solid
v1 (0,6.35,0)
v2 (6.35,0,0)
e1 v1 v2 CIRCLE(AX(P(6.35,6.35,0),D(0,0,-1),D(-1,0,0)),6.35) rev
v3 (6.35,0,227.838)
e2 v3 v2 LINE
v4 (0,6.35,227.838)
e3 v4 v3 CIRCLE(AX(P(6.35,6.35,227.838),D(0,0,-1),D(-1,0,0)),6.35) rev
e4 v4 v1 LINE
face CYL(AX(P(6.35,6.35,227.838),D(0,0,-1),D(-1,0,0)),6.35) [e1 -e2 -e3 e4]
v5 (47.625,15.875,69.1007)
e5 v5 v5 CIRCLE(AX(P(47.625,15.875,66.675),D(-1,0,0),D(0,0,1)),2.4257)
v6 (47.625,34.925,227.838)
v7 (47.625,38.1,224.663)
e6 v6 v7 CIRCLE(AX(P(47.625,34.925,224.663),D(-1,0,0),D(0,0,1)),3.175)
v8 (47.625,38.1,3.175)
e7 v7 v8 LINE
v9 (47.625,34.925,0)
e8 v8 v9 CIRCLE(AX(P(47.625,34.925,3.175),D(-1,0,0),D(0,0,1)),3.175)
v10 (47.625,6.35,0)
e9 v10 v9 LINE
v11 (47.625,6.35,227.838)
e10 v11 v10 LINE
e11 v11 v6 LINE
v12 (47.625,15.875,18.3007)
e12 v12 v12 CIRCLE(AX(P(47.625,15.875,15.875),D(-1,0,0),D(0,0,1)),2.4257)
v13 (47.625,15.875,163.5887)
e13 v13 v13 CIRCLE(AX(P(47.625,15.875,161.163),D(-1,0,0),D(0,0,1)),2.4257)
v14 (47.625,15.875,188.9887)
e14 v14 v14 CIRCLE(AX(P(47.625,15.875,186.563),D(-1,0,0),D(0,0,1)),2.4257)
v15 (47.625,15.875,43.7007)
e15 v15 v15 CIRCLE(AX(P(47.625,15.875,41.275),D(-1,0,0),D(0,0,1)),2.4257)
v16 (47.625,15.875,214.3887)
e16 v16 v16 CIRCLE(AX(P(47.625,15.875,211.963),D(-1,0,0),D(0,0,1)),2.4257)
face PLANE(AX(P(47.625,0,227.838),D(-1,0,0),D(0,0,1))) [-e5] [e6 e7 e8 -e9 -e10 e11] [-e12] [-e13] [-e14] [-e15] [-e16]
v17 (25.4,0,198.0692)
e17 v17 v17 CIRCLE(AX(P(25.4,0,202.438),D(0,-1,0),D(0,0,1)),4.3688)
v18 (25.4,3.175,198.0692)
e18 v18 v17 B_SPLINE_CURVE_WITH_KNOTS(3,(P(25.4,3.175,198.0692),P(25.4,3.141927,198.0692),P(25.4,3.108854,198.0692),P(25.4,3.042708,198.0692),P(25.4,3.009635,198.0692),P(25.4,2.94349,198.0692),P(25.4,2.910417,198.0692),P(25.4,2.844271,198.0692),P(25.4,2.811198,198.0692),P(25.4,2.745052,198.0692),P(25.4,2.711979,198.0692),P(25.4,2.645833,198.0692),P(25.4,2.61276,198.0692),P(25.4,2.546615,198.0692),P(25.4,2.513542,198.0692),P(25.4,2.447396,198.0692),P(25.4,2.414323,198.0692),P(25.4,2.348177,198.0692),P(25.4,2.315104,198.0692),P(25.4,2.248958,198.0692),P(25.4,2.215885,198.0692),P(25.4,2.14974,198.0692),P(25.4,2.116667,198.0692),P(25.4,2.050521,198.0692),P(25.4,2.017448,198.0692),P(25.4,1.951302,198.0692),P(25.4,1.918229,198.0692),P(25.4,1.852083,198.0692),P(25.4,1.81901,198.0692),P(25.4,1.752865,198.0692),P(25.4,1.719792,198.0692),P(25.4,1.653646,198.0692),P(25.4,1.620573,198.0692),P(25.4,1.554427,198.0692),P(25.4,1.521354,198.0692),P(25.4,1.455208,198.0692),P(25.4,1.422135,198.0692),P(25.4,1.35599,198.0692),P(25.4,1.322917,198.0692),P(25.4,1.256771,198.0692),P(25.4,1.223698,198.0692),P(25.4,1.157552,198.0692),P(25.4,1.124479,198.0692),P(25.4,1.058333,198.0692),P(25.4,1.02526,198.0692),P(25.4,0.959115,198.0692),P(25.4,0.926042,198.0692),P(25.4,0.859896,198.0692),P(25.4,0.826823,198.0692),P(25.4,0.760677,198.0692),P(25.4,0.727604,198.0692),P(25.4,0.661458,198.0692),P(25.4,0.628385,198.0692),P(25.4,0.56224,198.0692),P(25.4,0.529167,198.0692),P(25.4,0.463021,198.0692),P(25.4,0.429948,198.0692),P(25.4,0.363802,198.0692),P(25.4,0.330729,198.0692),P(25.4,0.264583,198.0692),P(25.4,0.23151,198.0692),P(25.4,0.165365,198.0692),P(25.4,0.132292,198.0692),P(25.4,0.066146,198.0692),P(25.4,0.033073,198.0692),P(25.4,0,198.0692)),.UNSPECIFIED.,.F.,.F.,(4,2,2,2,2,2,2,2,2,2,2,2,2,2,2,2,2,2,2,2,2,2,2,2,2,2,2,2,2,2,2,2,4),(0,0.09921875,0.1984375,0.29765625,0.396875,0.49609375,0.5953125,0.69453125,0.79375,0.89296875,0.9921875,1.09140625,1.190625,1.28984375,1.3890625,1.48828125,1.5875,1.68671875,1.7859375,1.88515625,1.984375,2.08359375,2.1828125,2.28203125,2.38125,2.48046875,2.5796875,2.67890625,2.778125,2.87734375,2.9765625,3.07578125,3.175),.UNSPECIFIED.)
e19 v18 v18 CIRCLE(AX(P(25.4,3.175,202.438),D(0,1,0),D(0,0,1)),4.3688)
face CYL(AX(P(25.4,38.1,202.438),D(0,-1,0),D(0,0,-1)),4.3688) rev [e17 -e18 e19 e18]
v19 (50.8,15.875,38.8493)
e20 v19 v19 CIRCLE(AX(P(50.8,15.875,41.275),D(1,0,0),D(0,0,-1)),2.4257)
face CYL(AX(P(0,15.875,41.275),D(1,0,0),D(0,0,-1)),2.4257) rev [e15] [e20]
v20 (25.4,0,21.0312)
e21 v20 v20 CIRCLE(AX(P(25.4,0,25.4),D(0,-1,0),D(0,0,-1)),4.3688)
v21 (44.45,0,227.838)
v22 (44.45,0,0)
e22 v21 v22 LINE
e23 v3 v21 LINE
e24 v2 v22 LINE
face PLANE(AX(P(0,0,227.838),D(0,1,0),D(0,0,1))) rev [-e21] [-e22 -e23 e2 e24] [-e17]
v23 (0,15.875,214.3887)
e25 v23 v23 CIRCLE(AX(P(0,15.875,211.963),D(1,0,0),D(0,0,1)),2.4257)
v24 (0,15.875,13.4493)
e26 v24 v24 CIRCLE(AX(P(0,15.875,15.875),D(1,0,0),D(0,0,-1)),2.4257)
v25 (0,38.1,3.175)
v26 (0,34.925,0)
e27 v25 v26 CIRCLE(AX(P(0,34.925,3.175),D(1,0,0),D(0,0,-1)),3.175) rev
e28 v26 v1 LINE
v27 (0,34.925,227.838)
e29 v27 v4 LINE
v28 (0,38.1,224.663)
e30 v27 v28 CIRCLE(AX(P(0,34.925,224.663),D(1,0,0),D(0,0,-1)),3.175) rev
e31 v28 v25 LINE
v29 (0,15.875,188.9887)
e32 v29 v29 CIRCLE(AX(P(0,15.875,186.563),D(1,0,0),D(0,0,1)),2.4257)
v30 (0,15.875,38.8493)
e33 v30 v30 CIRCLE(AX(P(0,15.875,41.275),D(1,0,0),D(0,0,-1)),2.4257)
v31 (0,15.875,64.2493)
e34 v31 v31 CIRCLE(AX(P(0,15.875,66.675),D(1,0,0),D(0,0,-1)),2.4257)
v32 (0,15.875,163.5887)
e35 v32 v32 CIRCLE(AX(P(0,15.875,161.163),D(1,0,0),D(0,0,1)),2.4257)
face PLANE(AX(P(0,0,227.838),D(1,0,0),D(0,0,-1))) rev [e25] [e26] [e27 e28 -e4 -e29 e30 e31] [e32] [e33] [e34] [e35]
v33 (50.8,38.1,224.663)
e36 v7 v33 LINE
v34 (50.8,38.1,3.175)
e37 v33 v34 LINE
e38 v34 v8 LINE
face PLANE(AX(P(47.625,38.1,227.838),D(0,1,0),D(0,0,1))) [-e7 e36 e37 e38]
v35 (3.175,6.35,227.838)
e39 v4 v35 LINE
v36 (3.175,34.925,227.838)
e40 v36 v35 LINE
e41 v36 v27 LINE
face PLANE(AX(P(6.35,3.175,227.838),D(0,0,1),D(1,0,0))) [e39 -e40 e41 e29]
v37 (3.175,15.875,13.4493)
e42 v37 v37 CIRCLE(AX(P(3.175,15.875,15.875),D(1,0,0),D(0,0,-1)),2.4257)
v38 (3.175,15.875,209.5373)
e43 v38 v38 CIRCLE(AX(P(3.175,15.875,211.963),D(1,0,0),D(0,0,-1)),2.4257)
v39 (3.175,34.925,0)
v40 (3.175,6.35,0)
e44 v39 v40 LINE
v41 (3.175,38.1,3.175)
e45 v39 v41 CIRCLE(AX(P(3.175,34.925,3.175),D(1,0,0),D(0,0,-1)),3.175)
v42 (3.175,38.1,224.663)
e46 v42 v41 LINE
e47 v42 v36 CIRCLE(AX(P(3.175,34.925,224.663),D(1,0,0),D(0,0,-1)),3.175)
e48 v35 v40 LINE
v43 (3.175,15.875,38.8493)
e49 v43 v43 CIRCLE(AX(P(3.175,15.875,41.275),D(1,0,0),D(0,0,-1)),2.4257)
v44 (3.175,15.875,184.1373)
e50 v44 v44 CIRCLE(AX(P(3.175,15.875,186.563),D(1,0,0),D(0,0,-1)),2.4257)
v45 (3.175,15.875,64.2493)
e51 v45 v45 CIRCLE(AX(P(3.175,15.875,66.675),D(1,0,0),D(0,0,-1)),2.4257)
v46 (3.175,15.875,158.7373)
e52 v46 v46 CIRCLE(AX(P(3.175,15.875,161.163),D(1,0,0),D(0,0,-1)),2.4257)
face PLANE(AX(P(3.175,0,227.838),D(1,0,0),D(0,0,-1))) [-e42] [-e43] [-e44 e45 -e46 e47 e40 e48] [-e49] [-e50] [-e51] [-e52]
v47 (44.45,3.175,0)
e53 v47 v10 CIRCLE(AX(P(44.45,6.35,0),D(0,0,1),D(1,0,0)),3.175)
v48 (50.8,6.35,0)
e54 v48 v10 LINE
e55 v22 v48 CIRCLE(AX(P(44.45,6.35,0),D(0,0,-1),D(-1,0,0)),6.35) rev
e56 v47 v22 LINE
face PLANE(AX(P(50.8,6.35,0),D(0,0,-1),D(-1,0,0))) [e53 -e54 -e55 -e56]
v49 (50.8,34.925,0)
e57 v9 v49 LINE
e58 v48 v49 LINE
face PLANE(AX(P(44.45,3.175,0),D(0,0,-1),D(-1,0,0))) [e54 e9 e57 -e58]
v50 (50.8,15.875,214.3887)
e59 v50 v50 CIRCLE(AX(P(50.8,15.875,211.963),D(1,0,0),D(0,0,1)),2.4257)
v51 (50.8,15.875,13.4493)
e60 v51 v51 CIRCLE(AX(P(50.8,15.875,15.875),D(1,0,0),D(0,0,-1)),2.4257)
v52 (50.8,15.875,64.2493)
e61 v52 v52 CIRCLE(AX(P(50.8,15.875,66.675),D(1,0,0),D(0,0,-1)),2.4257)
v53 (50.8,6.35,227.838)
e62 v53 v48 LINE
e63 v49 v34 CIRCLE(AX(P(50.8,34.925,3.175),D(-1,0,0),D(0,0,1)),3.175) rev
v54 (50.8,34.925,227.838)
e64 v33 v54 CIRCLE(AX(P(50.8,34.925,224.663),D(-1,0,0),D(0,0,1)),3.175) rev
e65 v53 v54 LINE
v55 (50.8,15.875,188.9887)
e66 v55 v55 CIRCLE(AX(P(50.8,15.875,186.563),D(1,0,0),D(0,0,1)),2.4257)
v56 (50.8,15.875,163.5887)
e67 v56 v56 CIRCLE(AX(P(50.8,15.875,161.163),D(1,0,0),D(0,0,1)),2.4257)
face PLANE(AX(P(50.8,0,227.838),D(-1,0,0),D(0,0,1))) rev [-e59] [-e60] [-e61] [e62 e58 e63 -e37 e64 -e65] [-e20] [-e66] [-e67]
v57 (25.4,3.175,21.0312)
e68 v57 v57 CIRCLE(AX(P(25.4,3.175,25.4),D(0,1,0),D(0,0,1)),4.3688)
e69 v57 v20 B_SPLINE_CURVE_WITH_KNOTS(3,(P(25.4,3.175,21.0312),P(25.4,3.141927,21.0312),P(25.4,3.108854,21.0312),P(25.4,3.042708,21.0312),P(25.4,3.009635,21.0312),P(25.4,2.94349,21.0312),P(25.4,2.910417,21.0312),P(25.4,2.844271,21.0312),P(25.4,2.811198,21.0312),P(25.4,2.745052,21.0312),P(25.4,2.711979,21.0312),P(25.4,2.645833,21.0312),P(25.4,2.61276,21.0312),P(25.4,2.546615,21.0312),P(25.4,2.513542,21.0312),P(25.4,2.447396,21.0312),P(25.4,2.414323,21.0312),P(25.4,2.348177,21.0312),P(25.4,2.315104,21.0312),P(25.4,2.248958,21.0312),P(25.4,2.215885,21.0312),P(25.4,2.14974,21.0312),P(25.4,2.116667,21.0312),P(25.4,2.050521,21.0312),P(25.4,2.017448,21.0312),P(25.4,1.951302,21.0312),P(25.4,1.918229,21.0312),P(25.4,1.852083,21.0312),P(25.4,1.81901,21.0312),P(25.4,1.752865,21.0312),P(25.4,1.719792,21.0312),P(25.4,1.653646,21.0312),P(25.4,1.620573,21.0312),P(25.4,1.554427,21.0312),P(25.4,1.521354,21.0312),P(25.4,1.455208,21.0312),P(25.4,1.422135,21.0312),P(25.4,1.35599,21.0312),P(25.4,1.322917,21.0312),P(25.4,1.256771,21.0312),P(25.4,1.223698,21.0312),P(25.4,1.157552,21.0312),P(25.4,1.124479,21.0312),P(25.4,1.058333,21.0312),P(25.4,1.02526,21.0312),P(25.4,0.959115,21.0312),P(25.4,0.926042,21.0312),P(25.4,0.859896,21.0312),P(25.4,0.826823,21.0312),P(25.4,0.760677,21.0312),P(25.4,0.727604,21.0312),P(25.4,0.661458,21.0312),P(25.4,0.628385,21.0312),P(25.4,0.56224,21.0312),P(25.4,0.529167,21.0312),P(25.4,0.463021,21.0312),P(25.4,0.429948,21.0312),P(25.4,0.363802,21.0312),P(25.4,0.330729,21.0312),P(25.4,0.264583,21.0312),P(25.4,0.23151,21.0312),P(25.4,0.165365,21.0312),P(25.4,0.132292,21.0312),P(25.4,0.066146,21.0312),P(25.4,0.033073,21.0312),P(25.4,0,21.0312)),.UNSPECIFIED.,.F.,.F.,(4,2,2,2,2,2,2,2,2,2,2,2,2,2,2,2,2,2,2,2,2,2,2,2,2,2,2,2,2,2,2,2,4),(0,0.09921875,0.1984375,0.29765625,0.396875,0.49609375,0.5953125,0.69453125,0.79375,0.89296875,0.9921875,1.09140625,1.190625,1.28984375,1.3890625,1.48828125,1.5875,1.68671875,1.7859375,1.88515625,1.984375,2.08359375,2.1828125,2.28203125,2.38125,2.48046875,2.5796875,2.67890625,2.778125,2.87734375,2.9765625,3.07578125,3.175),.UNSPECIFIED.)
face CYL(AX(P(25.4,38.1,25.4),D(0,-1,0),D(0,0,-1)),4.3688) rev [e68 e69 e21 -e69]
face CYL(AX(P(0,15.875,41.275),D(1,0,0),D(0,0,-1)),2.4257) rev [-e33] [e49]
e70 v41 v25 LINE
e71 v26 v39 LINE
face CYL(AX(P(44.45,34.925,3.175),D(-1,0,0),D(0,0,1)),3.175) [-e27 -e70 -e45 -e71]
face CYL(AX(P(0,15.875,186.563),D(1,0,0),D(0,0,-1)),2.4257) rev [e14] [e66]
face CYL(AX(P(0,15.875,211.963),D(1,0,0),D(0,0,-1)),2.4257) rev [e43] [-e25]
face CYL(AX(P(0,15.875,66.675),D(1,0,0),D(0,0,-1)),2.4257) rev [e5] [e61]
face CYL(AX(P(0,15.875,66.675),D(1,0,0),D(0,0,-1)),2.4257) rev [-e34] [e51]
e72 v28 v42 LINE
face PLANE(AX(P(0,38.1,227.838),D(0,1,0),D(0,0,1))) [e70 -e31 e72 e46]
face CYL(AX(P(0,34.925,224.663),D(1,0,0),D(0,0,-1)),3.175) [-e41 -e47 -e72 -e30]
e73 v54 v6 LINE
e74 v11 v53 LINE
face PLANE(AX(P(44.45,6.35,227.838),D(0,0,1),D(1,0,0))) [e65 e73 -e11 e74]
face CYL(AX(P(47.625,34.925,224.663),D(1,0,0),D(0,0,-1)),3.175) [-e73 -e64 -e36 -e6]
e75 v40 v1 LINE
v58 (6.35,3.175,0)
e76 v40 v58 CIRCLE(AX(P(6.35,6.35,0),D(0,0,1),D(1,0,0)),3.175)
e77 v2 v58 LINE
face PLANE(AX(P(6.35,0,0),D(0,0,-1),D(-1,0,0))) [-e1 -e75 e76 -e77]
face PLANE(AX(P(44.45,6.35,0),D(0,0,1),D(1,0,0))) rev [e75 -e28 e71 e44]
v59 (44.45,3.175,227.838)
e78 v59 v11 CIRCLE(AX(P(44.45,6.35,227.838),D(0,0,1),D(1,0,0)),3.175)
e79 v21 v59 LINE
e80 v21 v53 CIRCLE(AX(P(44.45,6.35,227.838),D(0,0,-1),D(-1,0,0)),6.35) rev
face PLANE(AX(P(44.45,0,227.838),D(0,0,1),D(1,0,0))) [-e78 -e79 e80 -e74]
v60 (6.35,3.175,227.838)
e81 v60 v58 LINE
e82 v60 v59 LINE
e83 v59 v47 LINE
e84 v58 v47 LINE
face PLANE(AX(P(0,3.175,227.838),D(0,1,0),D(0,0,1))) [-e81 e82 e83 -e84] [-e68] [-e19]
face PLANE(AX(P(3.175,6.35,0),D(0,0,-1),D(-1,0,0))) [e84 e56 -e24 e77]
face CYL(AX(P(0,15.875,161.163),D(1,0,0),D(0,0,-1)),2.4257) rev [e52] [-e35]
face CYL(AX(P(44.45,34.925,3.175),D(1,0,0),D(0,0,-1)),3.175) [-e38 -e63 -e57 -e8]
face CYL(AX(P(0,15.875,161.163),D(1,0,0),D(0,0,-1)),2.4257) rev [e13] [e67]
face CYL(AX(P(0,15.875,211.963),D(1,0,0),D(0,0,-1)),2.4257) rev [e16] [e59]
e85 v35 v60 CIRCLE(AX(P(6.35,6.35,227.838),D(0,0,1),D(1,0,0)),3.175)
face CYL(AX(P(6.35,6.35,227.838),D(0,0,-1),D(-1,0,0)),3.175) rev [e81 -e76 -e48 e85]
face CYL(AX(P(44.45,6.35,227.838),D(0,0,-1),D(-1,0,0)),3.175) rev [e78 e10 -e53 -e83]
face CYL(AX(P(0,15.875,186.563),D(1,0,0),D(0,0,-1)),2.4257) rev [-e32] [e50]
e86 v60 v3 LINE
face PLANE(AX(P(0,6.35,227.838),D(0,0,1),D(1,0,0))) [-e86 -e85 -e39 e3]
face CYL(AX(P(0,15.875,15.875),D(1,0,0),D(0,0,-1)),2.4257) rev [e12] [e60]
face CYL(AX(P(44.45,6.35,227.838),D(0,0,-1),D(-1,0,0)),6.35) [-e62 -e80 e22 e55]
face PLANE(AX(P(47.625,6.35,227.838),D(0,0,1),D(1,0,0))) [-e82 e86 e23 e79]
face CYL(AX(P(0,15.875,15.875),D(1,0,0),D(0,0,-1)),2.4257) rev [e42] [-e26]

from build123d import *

# Parameters (mm, degrees)
BASE_FLANGE1_DEPTH = 227.838
SKETCH6_R          = 2.4257
CUT_EXTRUDE1_DEPTH = 237.521466772
SKETCH7_R          = 4.3688
CUT_EXTRUDE2_DEPTH = 237.521466772
FILLET1_R          = 3.175


# Sheet-metal steps are written as plain solids
with BuildPart() as part:
    # Sketch1 → Base-Flange1 (new body)
    with BuildSketch(Plane.XY):
        with BuildLine():
            Line((50.8, 38.1), (50.8, 6.35))
            ThreePointArc((50.8, 6.35), (48.940128061, 1.859871939), (44.45, 0))
            Line((44.45, 0), (6.35, 0))
            ThreePointArc((6.35, 0), (1.859871939, 1.859871939), (0, 6.35))
            Line((0, 6.35), (0, 38.1))
            Line((0, 38.1), (3.175, 38.1))
            Line((3.175, 38.1), (3.175, 6.35))
            ThreePointArc((3.175, 6.35), (4.10493597, 4.10493597), (6.35, 3.175))
            Line((6.35, 3.175), (44.45, 3.175))
            ThreePointArc((44.45, 3.175), (46.69506403, 4.10493597), (47.625, 6.35))
            Line((47.625, 6.35), (47.625, 38.1))
            Line((47.625, 38.1), (50.8, 38.1))
        make_face()
    extrude(amount=BASE_FLANGE1_DEPTH)

    # Sketch6 → Cut-Extrude1 (cut, through all)
    with BuildSketch(Plane(origin=(50.8, 0, 0), x_dir=(0, 0, -1), z_dir=(1, 0, 0))):
        with Locations((-15.875, 15.875)):
            Circle(SKETCH6_R)
        with Locations((-41.275, 15.875)):
            Circle(SKETCH6_R)
        with Locations((-66.675, 15.875)):
            Circle(SKETCH6_R)
        with Locations((-161.163, 15.875)):
            Circle(SKETCH6_R)
        with Locations((-186.563, 15.875)):
            Circle(SKETCH6_R)
        with Locations((-211.963, 15.875)):
            Circle(SKETCH6_R)
    extrude(amount=-CUT_EXTRUDE1_DEPTH, mode=Mode.SUBTRACT)

    # Sketch7 → Cut-Extrude2 (cut, through all)
    with BuildSketch(Plane.XZ):
        with Locations(Location((25.4, 25.4, 0), (0, 0, 270))):
            Circle(SKETCH7_R)
        with Locations(Location((25.4, 202.438, 0), (0, 0, 270))):
            Circle(SKETCH7_R)
    extrude(amount=-CUT_EXTRUDE2_DEPTH, mode=Mode.SUBTRACT)

    # Fillet1
    fillet1_edges = [part.edges().sort_by_distance(p)[0] for p in [
        (1.5875, 38.1, 0),
        (49.2125, 38.1, 0),
        (1.5875, 38.1, 227.838),
        (49.2125, 38.1, 227.838),
    ]]
    fillet(fillet1_edges, radius=FILLET1_R)


solid = part.part
